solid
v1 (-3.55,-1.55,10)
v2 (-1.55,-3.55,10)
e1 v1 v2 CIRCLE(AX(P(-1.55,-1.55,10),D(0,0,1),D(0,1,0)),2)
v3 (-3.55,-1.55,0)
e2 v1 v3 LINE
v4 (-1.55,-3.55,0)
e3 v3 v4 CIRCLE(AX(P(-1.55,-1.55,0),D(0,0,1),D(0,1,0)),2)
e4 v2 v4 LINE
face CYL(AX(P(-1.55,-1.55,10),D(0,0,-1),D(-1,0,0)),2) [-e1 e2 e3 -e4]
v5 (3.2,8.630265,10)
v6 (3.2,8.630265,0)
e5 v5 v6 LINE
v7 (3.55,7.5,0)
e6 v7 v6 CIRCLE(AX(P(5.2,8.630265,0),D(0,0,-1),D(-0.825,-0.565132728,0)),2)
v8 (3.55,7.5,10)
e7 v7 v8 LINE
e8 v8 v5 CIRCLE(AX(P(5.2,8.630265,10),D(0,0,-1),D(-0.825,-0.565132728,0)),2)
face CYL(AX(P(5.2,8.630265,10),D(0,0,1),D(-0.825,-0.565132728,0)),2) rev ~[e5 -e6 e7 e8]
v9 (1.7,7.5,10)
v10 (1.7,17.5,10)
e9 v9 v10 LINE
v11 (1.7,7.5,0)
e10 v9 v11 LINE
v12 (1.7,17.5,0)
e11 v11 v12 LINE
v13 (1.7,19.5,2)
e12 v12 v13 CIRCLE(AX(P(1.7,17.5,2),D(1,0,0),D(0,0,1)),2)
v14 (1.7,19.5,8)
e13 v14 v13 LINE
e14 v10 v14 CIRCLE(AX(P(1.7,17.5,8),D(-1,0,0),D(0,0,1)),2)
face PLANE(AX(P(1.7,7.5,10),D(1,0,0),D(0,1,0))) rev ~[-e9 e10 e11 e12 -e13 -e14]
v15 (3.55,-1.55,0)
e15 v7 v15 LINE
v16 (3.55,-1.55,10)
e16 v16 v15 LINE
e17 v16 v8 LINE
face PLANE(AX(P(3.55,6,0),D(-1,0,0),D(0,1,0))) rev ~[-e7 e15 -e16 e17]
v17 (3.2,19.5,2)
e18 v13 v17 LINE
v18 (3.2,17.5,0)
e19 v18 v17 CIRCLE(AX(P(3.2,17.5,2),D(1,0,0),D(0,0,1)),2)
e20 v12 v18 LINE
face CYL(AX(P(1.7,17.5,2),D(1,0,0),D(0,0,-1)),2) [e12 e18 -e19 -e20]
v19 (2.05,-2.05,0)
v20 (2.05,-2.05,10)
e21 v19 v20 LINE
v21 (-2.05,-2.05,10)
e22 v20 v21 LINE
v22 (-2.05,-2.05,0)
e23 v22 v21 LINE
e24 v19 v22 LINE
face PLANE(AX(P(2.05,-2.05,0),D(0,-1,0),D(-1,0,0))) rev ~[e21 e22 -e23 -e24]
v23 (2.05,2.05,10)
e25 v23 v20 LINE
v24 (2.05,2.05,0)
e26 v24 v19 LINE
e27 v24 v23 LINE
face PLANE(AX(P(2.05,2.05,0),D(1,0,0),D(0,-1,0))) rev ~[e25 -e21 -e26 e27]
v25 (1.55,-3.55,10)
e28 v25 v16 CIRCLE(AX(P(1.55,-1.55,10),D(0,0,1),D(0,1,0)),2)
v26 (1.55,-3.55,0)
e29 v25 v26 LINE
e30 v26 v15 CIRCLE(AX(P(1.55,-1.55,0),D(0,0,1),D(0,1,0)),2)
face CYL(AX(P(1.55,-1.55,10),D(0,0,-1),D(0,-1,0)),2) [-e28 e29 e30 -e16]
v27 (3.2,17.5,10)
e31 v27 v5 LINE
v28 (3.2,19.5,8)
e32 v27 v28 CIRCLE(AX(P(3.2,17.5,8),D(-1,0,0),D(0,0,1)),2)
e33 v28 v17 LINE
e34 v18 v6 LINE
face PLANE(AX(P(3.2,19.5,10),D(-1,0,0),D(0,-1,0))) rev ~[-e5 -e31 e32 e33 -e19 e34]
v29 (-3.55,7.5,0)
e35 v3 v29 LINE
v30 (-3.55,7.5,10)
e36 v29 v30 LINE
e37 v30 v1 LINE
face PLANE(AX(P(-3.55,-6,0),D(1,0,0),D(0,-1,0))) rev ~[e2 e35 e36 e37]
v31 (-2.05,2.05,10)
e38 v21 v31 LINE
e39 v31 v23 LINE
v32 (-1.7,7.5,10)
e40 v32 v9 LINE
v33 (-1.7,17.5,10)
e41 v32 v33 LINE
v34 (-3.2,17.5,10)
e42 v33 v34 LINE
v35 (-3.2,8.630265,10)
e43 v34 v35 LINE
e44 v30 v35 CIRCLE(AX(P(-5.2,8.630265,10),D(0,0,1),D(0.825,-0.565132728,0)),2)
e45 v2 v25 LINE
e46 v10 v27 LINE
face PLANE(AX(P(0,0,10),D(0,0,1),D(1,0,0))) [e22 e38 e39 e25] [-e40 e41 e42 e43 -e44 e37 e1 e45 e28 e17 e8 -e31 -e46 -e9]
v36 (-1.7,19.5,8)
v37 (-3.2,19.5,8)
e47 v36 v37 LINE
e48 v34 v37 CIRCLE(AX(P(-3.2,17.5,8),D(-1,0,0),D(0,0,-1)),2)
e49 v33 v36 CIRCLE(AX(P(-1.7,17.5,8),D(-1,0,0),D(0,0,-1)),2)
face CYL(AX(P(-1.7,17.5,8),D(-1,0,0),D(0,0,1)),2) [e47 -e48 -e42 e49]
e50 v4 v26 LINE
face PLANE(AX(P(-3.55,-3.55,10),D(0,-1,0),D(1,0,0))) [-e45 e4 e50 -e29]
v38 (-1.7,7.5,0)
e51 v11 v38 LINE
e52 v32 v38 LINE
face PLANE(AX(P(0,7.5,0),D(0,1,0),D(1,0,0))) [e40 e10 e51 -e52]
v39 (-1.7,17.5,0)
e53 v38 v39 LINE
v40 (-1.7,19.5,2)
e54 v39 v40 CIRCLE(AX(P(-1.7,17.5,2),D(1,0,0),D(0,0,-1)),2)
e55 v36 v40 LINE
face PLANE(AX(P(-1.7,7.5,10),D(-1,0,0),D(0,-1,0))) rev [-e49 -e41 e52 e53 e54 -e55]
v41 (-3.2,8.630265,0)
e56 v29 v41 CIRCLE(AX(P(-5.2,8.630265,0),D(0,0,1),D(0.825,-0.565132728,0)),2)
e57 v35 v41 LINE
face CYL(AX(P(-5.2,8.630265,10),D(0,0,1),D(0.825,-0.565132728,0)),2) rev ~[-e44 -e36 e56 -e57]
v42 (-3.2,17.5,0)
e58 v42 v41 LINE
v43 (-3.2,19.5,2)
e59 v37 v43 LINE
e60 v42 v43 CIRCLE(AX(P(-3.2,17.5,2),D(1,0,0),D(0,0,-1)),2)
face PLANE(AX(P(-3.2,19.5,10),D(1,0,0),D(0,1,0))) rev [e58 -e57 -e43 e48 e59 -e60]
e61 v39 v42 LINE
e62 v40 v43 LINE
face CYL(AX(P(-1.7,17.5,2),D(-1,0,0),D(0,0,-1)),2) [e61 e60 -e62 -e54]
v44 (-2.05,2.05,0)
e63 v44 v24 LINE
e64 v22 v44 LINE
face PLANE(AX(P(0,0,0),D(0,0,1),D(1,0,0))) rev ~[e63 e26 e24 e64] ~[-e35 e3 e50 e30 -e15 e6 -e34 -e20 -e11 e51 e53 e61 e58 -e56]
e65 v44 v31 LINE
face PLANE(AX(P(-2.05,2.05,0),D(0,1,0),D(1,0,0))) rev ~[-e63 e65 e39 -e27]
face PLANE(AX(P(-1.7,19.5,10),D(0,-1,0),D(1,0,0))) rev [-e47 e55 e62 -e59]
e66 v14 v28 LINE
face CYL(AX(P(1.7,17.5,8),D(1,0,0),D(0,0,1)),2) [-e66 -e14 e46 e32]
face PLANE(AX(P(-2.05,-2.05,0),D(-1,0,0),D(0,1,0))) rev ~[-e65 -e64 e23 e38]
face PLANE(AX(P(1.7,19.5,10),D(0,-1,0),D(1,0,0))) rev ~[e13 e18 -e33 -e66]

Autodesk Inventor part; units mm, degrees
ref_plane "YZ Plane" through (0, 0, 0) normal (1, 0, 0) x (0, 1, 0)
ref_plane "XZ Plane" through (0, 0, 0) normal (0, 1, 0) x (-1, 0, 0)
ref_plane "XY Plane" through (0, 0, 0) normal (0, 0, 1) x (1, 0, 0)
sketch "Sketch1" plane through (0, 0, 0) normal (0, 0, 1) x (1, 0, 0)
  line L0 (-2.05, 2.05) -> (2.05, 2.05)
  line L1 (2.05, 2.05) -> (2.05, -2.05)
  line L2 (2.05, -2.05) -> (-2.05, -2.05)
  line L3 (-2.05, -2.05) -> (-2.05, 2.05)
  line L4 (0, 2.05) -> (0, -2.05) construction
  line L5 (0, 7.5) -> (-15.55, 7.5)
  line L6 (-15.55, 7.5) -> (-15.55, 6)
  line L7 (-15.55, 6) -> (-3.55, 6)
  line L8 (-3.55, 6) -> (-3.55, -6)
  line L9 (-3.55, -6) -> (-15.55, -6)
  line L10 (-15.55, -6) -> (-15.55, -7.5)
  line L11 (-15.55, -7.5) -> (-0.55, -7.5)
  line L12 (-2.05, 0) -> (2.05, 0) construction
  line L13 (0, 7.5) -> (15.55, 7.5)
  line L14 (15.55, 7.5) -> (15.55, 6)
  line L15 (15.55, 6) -> (3.55, 6)
  line L16 (3.55, 6) -> (3.55, -6)
  line L17 (3.55, -6) -> (15.55, -6)
  line L18 (15.55, -6) -> (15.55, -7.5)
  line L19 (15.55, -7.5) -> (-0.55, -7.5)
  line L20 (-2.05, 2.05) -> (2.05, -2.05) construction
  line L21 (2.05, 2.05) -> (-2.05, -2.05) construction
  line L22 (0, 7.5) -> (0, 2.05) construction
  line L23 (-3.55, 6) -> (-3.55, 7.5)
  line L24 (-3.55, -6) -> (-3.55, -7.5)
  line L25 (3.55, 6) -> (3.55, 7.5)
  line L26 (3.55, -6) -> (3.55, -7.5)
  point P0 (0, 0)
  point P1 (0, 0)
  point P2 (0, 0)
  dimension "d3" = 4.1
  dimension "d4" = 4.1
  dimension "d5" = 12
  dimension "d6" = 1.5
  dimension "d7" = 1.5
  dimension "d8" = 5.45
  dimension "d9" = 5.45
  dimension "d10" = 1.5
  dimension "d11" = 12
  dimension "d37" = 15
extrude "Extrusion1" add sketch "Sketch1" along normal blind 10 contours L13 L25 L16 L26 L19 L11 L24 L8 L23 L5
sketch "Sketch5" plane through (0, 0, 10) normal (0, 0, 1) x (1, 0, 0)
  line L0 (1.7, 19.5) -> (3.2, 19.5)
  line L1 (3.2, 19.5) -> (3.2, 7.5)
  line L2 (3.2, 7.5) -> (1.7, 7.5)
  line L3 (1.7, 7.5) -> (1.7, 19.5)
  line L4 (3.55, 7.5) -> (-3.55, 7.5) projected
  line L5 (3.55, -7.5) -> (3.55, 7.5) projected
  line L6 (0, 0) -> (0, 23.4065) construction
  point P0 (15.55, 7.5)
  point P1 (-15.55, 7.5)
  point P2 (3.55, -6)
  point P3 (3.55, 6)
  dimension "d41" = 1.5
  dimension "d42" = 12
  dimension "d47" = 1.7
extrude "Extrusion5" add sketch "Sketch5" against normal up to surface (10 mm away)
mirror "Mirror1" about plane through (0, 0, 0) normal (1, 0, 0) of "Extrusion5"
sketch "Sketch8" plane through (0, 0, 10) normal (0, 0, 1) x (1, 0, 0)
  line L0 (-3.55, -3.55) -> (3.55, -3.55)
  line L1 (3.55, -3.55) -> (3.55, -7.5)
  line L2 (3.55, -7.5) -> (-3.55, -7.5)
  line L3 (-3.55, -7.5) -> (-3.55, -3.55)
  line L4 (2.05, -2.05) -> (-2.05, -2.05) projected
  line L5 (3.55, -7.5) -> (3.55, 7.5) projected
  line L6 (-3.55, 7.5) -> (-3.55, -7.5) projected
  line L7 (-3.55, -7.5) -> (3.55, -7.5) projected
  point P0 (0, 0)
  point P1 (3.55, 5)
  point P2 (-3.55, 5)
  dimension "d57" = 1.5
extrude "Extrusion8" cut sketch "Sketch8" against normal blind 10
fillet "Fillet4" radius 2 4 edges at (-2.45, 19.5, 10) (-2.45, 19.5, 0) (2.45, 19.5, 0) (2.45, 19.5, 10)
fillet "Fillet5" radius 2 2 edges at (3.55, -3.55, 5) (-3.55, -3.55, 5)
fillet "Fillet6" radius 2 2 edges at (-3.2, 7.5, 5) (3.2, 7.5, 5)
equation "\"d7\" = d6"
equation "\"d8\" = d9"
properties part number "fuselage_tail_interface_airfoiled_v2" material "ABS Plastic"
